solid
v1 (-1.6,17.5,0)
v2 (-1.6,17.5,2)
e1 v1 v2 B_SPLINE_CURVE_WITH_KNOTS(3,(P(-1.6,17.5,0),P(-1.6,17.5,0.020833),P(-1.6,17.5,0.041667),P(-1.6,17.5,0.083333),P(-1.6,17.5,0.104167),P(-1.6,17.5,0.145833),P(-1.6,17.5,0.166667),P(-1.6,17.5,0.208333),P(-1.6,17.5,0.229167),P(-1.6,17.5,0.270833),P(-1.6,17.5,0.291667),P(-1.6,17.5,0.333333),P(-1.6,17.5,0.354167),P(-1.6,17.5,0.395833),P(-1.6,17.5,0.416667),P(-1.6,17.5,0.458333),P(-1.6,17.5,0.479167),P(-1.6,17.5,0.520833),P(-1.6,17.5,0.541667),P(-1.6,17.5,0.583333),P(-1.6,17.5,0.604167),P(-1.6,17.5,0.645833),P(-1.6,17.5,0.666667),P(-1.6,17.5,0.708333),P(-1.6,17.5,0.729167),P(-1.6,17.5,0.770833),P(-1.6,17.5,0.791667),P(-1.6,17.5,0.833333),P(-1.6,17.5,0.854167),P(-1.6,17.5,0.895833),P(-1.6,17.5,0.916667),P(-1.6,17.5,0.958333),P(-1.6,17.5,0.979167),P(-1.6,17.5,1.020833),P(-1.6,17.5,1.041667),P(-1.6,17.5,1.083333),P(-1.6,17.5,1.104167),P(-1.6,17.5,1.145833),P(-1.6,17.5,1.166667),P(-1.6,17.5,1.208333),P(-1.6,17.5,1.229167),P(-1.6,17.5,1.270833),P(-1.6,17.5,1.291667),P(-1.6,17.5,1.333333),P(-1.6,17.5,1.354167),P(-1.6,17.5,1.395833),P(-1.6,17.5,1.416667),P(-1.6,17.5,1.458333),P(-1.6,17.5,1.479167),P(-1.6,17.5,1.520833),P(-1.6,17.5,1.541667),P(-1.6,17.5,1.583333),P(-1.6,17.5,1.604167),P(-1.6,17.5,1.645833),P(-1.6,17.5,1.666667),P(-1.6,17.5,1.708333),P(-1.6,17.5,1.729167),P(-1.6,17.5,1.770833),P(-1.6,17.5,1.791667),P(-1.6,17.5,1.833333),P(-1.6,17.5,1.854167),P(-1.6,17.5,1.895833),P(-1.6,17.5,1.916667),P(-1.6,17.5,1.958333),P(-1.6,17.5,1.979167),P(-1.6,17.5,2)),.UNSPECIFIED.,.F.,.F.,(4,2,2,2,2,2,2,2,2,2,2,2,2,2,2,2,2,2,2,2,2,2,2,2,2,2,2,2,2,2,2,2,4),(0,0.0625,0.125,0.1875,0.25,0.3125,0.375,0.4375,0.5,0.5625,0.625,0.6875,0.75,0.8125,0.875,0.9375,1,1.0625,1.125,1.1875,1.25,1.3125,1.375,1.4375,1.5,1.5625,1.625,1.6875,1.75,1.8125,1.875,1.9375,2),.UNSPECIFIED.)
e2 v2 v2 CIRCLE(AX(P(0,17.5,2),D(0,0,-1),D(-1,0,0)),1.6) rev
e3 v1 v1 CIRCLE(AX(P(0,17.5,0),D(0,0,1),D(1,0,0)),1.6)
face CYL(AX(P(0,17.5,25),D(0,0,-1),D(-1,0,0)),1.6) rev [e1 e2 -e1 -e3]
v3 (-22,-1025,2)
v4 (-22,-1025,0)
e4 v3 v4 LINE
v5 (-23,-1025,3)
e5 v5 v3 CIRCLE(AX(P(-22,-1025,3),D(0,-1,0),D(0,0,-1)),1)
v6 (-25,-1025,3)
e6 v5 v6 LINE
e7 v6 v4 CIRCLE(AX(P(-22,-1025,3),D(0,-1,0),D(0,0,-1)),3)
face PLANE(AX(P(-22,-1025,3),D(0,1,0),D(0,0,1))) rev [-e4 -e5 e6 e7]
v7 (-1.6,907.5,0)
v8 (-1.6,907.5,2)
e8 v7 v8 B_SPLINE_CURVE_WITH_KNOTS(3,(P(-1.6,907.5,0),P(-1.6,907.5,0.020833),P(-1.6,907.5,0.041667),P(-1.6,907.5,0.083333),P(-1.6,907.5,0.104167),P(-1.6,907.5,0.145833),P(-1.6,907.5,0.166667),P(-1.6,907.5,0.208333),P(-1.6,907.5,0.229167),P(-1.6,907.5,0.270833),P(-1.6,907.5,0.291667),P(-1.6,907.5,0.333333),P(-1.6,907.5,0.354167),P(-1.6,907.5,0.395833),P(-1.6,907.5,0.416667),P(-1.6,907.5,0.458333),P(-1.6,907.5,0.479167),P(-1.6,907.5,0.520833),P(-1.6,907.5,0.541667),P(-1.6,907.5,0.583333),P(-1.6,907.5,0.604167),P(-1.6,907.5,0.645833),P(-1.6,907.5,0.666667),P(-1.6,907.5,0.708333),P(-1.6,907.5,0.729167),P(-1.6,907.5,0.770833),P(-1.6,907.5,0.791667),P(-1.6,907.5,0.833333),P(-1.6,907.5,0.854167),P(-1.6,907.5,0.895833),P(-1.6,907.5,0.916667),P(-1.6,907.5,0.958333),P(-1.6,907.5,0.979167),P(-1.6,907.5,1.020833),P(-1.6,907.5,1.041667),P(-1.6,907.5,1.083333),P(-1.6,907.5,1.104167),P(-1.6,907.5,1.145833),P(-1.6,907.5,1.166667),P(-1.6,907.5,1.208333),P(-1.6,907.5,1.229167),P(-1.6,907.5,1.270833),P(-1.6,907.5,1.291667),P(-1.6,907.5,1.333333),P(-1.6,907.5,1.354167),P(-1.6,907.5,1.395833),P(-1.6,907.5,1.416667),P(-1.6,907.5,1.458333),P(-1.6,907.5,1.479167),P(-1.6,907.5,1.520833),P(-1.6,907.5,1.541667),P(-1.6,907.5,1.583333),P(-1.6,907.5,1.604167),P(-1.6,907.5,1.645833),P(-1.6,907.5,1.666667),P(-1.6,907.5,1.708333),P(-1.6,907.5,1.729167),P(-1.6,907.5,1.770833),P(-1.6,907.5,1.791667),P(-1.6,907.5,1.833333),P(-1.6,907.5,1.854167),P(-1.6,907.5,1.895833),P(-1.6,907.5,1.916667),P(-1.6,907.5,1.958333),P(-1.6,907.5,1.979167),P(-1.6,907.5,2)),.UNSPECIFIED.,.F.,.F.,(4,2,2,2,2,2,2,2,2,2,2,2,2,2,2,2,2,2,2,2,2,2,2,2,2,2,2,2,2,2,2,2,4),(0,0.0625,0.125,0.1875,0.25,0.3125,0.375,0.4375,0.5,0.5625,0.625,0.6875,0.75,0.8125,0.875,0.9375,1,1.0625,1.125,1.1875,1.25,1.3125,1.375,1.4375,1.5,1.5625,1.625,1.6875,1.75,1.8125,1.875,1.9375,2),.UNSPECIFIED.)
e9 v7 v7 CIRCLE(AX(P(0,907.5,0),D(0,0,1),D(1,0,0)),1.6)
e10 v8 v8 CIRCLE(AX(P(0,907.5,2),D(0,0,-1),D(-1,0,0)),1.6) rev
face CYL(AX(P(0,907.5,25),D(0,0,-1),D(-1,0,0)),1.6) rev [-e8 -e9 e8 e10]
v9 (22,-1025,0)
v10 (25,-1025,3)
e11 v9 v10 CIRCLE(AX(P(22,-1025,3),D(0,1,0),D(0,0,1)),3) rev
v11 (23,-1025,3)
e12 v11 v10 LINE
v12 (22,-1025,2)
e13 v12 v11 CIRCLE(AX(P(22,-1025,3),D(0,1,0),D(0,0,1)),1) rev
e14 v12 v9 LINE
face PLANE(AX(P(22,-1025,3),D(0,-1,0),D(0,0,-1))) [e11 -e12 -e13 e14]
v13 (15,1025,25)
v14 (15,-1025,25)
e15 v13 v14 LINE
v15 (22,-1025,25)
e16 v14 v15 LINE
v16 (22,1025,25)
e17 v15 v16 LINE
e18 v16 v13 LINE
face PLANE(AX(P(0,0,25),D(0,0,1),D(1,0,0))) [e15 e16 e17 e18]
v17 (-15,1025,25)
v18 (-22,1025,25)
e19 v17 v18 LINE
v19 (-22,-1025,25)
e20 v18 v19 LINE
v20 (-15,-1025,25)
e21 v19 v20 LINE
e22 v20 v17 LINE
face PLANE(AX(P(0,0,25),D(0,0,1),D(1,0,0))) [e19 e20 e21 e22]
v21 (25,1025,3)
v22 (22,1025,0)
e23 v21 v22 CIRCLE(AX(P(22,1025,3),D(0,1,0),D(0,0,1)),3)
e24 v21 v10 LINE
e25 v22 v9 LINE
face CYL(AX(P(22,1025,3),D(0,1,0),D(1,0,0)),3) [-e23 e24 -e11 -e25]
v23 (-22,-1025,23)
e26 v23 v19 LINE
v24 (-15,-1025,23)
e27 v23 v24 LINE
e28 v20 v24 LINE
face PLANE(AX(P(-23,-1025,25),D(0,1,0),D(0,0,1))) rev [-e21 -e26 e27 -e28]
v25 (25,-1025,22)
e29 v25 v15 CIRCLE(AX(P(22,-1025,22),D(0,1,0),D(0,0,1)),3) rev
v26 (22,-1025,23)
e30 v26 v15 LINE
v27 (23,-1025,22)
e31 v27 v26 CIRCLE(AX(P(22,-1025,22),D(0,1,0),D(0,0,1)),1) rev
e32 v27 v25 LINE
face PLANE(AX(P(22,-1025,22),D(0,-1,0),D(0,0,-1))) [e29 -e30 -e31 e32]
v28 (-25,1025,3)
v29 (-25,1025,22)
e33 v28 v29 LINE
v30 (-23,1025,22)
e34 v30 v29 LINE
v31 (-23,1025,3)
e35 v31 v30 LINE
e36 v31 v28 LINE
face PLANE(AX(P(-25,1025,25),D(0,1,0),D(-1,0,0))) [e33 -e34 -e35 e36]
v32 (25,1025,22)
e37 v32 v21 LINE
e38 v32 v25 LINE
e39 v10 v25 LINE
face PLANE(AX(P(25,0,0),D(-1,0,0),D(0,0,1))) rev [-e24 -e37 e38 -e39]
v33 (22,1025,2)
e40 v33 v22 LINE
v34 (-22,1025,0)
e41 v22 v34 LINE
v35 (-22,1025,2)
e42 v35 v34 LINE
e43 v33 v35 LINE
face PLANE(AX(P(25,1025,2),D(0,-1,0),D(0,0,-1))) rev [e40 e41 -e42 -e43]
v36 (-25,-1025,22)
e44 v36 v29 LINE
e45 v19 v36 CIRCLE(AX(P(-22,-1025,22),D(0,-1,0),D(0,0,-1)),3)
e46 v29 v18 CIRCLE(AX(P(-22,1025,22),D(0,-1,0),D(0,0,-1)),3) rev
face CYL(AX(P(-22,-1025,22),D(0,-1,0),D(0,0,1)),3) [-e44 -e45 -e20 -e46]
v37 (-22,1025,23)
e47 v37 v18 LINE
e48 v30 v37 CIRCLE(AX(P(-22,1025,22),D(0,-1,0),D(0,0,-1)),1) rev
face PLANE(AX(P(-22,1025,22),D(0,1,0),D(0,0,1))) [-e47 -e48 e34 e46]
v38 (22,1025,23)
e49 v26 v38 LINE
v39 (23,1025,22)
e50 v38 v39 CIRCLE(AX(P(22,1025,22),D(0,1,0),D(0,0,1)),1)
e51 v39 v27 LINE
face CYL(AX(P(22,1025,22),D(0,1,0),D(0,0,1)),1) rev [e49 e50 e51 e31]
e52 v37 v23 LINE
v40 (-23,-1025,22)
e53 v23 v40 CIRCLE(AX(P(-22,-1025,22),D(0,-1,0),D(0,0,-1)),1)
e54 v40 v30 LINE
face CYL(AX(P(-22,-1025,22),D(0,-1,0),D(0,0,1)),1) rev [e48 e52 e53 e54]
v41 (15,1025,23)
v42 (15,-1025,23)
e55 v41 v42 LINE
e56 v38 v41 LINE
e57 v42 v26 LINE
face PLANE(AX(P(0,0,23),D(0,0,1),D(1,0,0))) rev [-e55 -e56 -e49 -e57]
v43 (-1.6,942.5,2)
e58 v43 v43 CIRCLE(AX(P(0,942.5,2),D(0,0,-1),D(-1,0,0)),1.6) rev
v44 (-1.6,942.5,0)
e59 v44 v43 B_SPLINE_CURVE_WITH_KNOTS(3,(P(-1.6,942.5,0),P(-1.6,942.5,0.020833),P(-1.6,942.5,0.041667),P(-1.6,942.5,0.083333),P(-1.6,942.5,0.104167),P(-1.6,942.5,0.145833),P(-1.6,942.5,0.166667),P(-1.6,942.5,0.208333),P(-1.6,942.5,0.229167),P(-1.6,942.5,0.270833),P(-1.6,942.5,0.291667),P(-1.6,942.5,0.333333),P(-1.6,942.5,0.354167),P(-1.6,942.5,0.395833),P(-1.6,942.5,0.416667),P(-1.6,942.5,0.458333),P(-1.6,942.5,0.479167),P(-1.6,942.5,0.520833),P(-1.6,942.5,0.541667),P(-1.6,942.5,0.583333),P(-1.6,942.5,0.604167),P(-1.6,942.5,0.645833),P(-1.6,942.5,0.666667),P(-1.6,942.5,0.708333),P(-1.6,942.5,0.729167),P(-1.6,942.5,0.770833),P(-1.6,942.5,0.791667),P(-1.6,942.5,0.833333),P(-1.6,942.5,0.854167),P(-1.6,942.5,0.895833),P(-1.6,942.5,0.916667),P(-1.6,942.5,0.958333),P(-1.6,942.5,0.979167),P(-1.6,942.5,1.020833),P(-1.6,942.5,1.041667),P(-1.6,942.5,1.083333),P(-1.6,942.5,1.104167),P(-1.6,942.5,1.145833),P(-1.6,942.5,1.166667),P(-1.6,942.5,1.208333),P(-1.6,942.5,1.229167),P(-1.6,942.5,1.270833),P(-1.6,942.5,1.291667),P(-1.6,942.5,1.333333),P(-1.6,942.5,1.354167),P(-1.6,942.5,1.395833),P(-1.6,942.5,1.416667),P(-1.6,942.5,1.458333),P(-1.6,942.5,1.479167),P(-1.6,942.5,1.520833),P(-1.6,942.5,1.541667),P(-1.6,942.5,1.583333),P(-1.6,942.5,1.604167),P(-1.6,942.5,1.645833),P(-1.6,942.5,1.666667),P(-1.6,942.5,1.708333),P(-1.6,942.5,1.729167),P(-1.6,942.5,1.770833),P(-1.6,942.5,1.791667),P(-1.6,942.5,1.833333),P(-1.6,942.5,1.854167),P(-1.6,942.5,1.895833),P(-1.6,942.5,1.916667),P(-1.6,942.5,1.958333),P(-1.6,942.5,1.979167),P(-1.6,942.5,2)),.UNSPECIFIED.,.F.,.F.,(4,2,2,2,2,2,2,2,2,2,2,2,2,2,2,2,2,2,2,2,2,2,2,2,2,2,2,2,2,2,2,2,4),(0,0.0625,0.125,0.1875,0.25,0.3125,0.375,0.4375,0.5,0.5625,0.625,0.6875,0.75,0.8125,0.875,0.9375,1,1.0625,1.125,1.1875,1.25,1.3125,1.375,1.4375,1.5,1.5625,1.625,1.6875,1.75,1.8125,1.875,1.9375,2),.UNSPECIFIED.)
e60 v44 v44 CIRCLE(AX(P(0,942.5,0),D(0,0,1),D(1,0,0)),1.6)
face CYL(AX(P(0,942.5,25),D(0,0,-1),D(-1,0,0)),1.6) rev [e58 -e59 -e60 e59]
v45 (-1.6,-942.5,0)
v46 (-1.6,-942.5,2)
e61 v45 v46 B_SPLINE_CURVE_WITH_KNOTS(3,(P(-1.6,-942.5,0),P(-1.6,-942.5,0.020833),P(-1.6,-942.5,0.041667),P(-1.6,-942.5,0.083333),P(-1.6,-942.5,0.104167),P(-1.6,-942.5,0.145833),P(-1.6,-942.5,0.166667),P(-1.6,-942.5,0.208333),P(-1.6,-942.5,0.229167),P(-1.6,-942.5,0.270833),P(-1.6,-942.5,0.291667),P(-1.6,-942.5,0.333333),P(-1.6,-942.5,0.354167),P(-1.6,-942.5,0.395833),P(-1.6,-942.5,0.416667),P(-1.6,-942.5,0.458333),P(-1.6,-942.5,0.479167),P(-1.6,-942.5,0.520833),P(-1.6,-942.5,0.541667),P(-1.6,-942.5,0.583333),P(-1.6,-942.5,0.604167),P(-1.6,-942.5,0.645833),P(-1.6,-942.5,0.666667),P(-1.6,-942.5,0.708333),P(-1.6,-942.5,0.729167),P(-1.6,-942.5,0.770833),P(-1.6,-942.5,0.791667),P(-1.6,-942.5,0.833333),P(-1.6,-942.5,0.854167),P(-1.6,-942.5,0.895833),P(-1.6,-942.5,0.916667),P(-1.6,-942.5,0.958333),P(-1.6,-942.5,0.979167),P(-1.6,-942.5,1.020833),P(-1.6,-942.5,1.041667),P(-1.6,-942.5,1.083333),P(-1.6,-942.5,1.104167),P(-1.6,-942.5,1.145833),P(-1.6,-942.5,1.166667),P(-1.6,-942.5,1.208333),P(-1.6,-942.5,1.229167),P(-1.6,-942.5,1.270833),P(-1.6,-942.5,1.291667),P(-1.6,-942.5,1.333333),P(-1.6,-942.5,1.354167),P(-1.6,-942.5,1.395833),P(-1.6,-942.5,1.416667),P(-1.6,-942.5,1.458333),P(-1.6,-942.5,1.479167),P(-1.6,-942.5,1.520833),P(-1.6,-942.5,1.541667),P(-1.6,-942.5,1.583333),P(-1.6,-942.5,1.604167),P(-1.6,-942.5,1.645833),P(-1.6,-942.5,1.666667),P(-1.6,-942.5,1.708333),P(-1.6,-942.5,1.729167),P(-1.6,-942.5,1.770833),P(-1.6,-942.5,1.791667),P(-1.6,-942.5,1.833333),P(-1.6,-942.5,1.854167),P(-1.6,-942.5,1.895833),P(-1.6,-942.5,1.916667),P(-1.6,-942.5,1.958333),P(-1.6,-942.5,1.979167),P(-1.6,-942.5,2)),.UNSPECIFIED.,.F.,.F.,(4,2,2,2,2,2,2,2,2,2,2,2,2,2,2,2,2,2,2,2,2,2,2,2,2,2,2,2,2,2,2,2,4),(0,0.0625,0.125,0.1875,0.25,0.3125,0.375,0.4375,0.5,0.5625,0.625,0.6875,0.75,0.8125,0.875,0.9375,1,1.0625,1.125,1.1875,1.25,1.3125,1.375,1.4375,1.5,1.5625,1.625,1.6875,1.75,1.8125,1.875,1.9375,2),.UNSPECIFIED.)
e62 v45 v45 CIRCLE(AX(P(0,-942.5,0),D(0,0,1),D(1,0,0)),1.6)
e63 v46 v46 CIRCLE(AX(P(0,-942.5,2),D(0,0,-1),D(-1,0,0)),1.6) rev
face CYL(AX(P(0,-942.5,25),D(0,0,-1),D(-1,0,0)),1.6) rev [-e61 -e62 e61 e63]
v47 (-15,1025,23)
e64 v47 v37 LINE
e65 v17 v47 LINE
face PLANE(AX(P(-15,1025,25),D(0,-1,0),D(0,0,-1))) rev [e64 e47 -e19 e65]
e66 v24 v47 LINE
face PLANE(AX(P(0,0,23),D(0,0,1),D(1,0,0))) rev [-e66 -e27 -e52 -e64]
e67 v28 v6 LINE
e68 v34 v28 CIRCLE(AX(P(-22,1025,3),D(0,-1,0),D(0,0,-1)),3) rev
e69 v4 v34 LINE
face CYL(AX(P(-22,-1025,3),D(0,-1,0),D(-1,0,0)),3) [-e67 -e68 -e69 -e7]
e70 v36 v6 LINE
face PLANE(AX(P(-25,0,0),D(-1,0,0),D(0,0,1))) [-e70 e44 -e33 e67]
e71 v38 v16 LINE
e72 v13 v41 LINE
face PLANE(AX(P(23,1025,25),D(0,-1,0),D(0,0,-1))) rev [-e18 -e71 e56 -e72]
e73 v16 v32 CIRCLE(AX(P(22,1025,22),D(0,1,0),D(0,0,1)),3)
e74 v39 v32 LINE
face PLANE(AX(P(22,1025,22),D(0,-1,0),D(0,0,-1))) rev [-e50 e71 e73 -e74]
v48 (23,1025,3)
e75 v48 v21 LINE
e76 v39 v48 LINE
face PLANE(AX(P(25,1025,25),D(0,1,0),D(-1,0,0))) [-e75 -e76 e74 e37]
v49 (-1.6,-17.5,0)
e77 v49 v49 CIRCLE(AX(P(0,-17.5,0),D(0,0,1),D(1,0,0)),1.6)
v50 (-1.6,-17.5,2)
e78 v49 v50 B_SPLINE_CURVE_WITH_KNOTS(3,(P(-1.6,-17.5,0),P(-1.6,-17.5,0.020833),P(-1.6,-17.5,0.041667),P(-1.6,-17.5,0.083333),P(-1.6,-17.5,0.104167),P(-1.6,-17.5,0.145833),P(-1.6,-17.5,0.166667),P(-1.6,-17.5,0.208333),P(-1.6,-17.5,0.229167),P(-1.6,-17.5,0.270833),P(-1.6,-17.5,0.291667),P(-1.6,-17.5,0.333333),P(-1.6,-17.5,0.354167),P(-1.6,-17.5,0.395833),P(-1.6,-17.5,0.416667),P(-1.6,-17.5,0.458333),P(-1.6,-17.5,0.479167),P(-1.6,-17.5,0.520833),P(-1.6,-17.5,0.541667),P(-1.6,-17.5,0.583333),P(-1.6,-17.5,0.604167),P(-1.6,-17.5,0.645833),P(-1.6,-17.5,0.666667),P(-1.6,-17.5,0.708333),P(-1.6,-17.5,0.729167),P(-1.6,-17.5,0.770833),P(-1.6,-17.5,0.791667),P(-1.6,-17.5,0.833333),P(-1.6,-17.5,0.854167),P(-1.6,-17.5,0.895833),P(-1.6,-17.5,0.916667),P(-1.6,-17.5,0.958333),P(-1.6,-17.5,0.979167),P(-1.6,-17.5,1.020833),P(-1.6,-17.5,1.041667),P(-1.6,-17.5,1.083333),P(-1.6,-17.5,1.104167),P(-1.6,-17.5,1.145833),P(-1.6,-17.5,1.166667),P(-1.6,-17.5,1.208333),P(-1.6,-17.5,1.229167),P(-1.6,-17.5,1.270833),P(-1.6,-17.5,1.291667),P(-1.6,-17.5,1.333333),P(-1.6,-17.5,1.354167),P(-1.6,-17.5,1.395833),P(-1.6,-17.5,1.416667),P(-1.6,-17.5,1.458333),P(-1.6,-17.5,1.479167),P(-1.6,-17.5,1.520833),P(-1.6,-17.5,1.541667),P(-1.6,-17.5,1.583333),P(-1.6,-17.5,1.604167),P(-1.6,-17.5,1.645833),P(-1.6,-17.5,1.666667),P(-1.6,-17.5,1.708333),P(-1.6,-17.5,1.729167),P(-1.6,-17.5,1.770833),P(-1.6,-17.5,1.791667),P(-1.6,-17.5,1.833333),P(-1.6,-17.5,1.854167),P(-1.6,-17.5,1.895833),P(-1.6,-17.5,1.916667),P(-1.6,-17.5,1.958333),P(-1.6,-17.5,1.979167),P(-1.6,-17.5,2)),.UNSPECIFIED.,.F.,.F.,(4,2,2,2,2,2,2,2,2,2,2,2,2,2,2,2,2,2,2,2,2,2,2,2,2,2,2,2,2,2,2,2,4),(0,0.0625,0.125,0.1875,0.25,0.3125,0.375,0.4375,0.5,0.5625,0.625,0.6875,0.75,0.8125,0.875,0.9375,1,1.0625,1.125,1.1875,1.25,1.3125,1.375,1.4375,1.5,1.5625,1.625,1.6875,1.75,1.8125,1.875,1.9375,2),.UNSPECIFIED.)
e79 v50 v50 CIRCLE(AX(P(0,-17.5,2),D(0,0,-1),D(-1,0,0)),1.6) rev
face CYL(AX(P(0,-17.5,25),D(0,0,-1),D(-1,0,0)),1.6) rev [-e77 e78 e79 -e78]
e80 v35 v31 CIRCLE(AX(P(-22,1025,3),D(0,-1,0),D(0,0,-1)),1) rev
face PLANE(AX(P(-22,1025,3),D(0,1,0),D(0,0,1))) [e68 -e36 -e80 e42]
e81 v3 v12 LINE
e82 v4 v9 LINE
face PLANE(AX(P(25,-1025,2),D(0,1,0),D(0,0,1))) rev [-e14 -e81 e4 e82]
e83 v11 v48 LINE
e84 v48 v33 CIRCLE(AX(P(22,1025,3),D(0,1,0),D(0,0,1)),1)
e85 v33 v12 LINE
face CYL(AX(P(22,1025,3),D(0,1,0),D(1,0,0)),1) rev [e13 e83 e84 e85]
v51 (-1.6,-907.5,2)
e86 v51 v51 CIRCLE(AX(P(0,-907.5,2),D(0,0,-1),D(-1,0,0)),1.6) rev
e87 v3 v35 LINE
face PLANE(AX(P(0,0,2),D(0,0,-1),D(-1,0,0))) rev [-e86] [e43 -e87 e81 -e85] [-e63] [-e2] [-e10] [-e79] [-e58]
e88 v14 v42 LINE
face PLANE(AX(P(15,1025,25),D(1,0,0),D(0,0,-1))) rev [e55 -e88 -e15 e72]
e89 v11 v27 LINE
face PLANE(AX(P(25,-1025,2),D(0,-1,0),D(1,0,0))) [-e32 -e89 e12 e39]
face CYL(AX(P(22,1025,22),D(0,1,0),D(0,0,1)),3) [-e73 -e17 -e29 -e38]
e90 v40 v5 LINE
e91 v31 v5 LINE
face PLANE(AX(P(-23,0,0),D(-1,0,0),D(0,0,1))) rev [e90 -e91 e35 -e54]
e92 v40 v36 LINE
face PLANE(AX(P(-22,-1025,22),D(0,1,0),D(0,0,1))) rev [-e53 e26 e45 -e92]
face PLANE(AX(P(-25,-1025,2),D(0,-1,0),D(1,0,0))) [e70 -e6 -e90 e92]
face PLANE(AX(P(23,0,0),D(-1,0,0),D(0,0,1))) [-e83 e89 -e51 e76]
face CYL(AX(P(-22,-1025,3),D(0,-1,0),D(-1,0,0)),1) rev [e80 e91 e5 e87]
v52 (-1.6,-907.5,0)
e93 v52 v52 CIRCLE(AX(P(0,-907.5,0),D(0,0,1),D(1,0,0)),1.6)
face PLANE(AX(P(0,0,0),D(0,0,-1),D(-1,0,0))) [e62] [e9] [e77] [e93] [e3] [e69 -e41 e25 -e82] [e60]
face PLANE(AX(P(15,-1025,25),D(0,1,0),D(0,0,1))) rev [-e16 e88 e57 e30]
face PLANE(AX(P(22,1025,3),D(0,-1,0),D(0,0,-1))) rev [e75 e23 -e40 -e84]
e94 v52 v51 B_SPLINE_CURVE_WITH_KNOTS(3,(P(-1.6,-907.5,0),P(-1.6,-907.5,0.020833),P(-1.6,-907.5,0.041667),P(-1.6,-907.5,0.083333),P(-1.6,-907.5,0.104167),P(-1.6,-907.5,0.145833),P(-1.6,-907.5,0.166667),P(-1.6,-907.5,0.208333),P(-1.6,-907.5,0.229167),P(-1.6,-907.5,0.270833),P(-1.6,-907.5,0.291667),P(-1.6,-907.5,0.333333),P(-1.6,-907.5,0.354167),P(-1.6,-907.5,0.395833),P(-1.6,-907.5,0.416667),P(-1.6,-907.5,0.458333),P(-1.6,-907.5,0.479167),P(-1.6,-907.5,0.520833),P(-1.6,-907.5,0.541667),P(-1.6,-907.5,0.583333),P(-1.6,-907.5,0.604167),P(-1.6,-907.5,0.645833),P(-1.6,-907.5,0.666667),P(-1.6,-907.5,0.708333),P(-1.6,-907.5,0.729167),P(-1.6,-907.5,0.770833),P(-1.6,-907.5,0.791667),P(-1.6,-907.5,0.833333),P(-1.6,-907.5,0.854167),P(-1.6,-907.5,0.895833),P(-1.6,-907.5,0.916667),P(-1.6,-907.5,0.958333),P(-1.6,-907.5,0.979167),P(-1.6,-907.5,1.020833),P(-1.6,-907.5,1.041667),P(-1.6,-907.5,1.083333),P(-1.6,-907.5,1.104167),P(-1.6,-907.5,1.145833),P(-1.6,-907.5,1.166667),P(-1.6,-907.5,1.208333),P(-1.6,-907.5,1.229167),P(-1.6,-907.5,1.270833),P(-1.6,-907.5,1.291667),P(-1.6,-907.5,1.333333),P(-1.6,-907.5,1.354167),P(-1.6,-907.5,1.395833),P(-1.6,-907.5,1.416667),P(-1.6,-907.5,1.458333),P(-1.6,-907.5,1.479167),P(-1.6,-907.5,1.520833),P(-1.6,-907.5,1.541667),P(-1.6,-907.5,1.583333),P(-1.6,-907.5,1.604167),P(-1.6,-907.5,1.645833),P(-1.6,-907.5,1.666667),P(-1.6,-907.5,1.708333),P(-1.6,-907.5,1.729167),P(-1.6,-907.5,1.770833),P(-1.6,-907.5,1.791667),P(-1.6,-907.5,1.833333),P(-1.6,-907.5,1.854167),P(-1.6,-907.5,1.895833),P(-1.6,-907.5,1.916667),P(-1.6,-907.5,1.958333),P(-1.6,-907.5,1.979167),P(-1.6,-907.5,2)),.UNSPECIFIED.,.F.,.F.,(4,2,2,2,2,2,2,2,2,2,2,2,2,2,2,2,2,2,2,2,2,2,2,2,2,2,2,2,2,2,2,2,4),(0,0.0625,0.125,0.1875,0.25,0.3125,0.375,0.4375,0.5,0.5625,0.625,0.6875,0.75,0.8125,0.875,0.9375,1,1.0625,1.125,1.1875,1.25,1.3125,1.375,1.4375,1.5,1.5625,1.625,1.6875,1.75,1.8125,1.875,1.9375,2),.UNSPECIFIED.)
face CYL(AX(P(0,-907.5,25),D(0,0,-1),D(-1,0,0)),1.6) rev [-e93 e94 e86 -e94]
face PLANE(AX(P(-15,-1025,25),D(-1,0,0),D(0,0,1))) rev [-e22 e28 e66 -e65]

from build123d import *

# Parameters (mm, degrees)
BASEFLANGE_W                   = 50
BASEFLANGE_H                   = 2050
BASE_FLANGE1_DEPTH             = 2
EDGE_FLANGE1_STRIP_W           = 10
EDGE_FLANGE1_STRIP_H           = 2
EDGE_FLANGE1_STRIP_CUT_DEPTH   = 2050
EDGE_FLANGE1_STRIP_2_W         = 10
EDGE_FLANGE1_STRIP_2_H         = 2
EDGE_FLANGE1_STRIP_CUT_2_DEPTH = 2050
EDGE_FLANGE1_DEPTH             = 2050
EDGE_FLANGE1_BEND_DEPTH        = 2050
EDGE_FLANGE2_STRIP_W           = 10
EDGE_FLANGE2_STRIP_H           = 2
EDGE_FLANGE2_STRIP_CUT_DEPTH   = 2050
EDGE_FLANGE2_STRIP_2_W         = 10
EDGE_FLANGE2_STRIP_2_H         = 2
EDGE_FLANGE2_STRIP_CUT_2_DEPTH = 2050
EDGE_FLANGE2_DEPTH             = 2050
EDGE_FLANGE2_BEND_DEPTH        = 2050
SKETCH18_R                     = 1.6
CUT_EXTRUDE1_DEPTH             = 1026.609574838


# Sheet-metal steps are written as plain solids
with BuildPart() as part:
    # BaseFlange → Base-Flange1 (new body)
    with BuildSketch(Plane.XY):
        Rectangle(BASEFLANGE_W, BASEFLANGE_H)
    extrude(amount=BASE_FLANGE1_DEPTH)

    # Edge-Flange1 strip (across the edge) → Edge-Flange1 strip cut (cut)
    with BuildSketch(Plane(origin=(25, -1025, 2), x_dir=(-1, 0, 0), z_dir=(0, 1, 0))):
        with Locations((-2, -1)):
            Rectangle(EDGE_FLANGE1_STRIP_W, EDGE_FLANGE1_STRIP_H)
    extrude(amount=EDGE_FLANGE1_STRIP_CUT_DEPTH, mode=Mode.SUBTRACT)

    # Edge-Flange1 strip 2 (across the edge) → Edge-Flange1 strip cut 2 (cut)
    with BuildSketch(Plane(origin=(-25, 1025, 2), x_dir=(1, 0, 0), z_dir=(0, -1, 0))):
        with Locations((-2, -1)):
            Rectangle(EDGE_FLANGE1_STRIP_2_W, EDGE_FLANGE1_STRIP_2_H)
    extrude(amount=EDGE_FLANGE1_STRIP_CUT_2_DEPTH, mode=Mode.SUBTRACT)

    # Edge-Flange1 section (across the edge) → Edge-Flange1 (add)
    with BuildSketch(Plane(origin=(25, -1025, 2), x_dir=(-1, 0, 0), z_dir=(0, 1, 0))):
        with BuildLine():
            Line((0, 1), (0, 23))
            Line((0, 23), (2, 23))
            Line((2, 23), (2, 1))
            ThreePointArc((2, 1), (2.292893219, 0.292893219), (3, 0))
            Line((3, 0), (3, -2))
            ThreePointArc((3, -2), (0.878679656, -1.121320344), (0, 1))
        make_face()
    extrude(amount=EDGE_FLANGE1_DEPTH)

    # Edge-Flange1 section 2 (across the edge) → Edge-Flange1 bend (add)
    with BuildSketch(Plane(origin=(-25, 1025, 2), x_dir=(1, 0, 0), z_dir=(0, -1, 0))):
        with BuildLine():
            Line((0, 1), (0, 23))
            Line((0, 23), (2, 23))
            Line((2, 23), (2, 1))
            ThreePointArc((2, 1), (2.292893219, 0.292893219), (3, 0))
            Line((3, 0), (3, -2))
            ThreePointArc((3, -2), (0.878679656, -1.121320344), (0, 1))
        make_face()
    extrude(amount=EDGE_FLANGE1_BEND_DEPTH)

    # Edge-Flange2 strip (across the edge) → Edge-Flange2 strip cut (cut)
    with BuildSketch(Plane(origin=(-23, 1025, 25), x_dir=(0, 0, -1), z_dir=(0, -1, 0))):
        with Locations((-2, -1)):
            Rectangle(EDGE_FLANGE2_STRIP_W, EDGE_FLANGE2_STRIP_H)
    extrude(amount=EDGE_FLANGE2_STRIP_CUT_DEPTH, mode=Mode.SUBTRACT)

    # Edge-Flange2 strip 2 (across the edge) → Edge-Flange2 strip cut 2 (cut)
    with BuildSketch(Plane(origin=(23, -1025, 25), x_dir=(0, 0, -1), z_dir=(0, 1, 0))):
        with Locations((-2, -1)):
            Rectangle(EDGE_FLANGE2_STRIP_2_W, EDGE_FLANGE2_STRIP_2_H)
    extrude(amount=EDGE_FLANGE2_STRIP_CUT_2_DEPTH, mode=Mode.SUBTRACT)

    # Edge-Flange2 section (across the edge) → Edge-Flange2 (add)
    with BuildSketch(Plane(origin=(-23, 1025, 25), x_dir=(0, 0, -1), z_dir=(0, -1, 0))):
        with BuildLine():
            Line((0, 1), (0, 8))
            Line((0, 8), (2, 8))
            Line((2, 8), (2, 1))
            ThreePointArc((2, 1), (2.292893219, 0.292893219), (3, 0))
            Line((3, 0), (3, -2))
            ThreePointArc((3, -2), (0.878679656, -1.121320344), (0, 1))
        make_face()
    extrude(amount=EDGE_FLANGE2_DEPTH)

    # Edge-Flange2 section 2 (across the edge) → Edge-Flange2 bend (add)
    with BuildSketch(Plane(origin=(23, -1025, 25), x_dir=(0, 0, -1), z_dir=(0, 1, 0))):
        with BuildLine():
            Line((0, 1), (0, 8))
            Line((0, 8), (2, 8))
            Line((2, 8), (2, 1))
            ThreePointArc((2, 1), (2.292893219, 0.292893219), (3, 0))
            Line((3, 0), (3, -2))
            ThreePointArc((3, -2), (0.878679656, -1.121320344), (0, 1))
        make_face()
    extrude(amount=EDGE_FLANGE2_BEND_DEPTH)

    # Sketch18 → Cut-Extrude1 (cut, through all)
    with BuildSketch(Plane.XY):
        with Locations(Location((0, -17.5, 0), (0, 0, 180))):
            Circle(SKETCH18_R)
        with Locations(Location((0, -942.5, 0), (0, 0, 180))):
            Circle(SKETCH18_R)
        with Locations(Location((0, 942.5, 0), (0, 0, 180))):
            Circle(SKETCH18_R)
        with Locations(Location((0, -907.5, 0), (0, 0, 180))):
            Circle(SKETCH18_R)
        with Locations(Location((0, 17.5, 0), (0, 0, 180))):
            Circle(SKETCH18_R)
        with Locations(Location((0, 907.5, 0), (0, 0, 180))):
            Circle(SKETCH18_R)
    extrude(amount=CUT_EXTRUDE1_DEPTH, mode=Mode.SUBTRACT)


solid = part.part
